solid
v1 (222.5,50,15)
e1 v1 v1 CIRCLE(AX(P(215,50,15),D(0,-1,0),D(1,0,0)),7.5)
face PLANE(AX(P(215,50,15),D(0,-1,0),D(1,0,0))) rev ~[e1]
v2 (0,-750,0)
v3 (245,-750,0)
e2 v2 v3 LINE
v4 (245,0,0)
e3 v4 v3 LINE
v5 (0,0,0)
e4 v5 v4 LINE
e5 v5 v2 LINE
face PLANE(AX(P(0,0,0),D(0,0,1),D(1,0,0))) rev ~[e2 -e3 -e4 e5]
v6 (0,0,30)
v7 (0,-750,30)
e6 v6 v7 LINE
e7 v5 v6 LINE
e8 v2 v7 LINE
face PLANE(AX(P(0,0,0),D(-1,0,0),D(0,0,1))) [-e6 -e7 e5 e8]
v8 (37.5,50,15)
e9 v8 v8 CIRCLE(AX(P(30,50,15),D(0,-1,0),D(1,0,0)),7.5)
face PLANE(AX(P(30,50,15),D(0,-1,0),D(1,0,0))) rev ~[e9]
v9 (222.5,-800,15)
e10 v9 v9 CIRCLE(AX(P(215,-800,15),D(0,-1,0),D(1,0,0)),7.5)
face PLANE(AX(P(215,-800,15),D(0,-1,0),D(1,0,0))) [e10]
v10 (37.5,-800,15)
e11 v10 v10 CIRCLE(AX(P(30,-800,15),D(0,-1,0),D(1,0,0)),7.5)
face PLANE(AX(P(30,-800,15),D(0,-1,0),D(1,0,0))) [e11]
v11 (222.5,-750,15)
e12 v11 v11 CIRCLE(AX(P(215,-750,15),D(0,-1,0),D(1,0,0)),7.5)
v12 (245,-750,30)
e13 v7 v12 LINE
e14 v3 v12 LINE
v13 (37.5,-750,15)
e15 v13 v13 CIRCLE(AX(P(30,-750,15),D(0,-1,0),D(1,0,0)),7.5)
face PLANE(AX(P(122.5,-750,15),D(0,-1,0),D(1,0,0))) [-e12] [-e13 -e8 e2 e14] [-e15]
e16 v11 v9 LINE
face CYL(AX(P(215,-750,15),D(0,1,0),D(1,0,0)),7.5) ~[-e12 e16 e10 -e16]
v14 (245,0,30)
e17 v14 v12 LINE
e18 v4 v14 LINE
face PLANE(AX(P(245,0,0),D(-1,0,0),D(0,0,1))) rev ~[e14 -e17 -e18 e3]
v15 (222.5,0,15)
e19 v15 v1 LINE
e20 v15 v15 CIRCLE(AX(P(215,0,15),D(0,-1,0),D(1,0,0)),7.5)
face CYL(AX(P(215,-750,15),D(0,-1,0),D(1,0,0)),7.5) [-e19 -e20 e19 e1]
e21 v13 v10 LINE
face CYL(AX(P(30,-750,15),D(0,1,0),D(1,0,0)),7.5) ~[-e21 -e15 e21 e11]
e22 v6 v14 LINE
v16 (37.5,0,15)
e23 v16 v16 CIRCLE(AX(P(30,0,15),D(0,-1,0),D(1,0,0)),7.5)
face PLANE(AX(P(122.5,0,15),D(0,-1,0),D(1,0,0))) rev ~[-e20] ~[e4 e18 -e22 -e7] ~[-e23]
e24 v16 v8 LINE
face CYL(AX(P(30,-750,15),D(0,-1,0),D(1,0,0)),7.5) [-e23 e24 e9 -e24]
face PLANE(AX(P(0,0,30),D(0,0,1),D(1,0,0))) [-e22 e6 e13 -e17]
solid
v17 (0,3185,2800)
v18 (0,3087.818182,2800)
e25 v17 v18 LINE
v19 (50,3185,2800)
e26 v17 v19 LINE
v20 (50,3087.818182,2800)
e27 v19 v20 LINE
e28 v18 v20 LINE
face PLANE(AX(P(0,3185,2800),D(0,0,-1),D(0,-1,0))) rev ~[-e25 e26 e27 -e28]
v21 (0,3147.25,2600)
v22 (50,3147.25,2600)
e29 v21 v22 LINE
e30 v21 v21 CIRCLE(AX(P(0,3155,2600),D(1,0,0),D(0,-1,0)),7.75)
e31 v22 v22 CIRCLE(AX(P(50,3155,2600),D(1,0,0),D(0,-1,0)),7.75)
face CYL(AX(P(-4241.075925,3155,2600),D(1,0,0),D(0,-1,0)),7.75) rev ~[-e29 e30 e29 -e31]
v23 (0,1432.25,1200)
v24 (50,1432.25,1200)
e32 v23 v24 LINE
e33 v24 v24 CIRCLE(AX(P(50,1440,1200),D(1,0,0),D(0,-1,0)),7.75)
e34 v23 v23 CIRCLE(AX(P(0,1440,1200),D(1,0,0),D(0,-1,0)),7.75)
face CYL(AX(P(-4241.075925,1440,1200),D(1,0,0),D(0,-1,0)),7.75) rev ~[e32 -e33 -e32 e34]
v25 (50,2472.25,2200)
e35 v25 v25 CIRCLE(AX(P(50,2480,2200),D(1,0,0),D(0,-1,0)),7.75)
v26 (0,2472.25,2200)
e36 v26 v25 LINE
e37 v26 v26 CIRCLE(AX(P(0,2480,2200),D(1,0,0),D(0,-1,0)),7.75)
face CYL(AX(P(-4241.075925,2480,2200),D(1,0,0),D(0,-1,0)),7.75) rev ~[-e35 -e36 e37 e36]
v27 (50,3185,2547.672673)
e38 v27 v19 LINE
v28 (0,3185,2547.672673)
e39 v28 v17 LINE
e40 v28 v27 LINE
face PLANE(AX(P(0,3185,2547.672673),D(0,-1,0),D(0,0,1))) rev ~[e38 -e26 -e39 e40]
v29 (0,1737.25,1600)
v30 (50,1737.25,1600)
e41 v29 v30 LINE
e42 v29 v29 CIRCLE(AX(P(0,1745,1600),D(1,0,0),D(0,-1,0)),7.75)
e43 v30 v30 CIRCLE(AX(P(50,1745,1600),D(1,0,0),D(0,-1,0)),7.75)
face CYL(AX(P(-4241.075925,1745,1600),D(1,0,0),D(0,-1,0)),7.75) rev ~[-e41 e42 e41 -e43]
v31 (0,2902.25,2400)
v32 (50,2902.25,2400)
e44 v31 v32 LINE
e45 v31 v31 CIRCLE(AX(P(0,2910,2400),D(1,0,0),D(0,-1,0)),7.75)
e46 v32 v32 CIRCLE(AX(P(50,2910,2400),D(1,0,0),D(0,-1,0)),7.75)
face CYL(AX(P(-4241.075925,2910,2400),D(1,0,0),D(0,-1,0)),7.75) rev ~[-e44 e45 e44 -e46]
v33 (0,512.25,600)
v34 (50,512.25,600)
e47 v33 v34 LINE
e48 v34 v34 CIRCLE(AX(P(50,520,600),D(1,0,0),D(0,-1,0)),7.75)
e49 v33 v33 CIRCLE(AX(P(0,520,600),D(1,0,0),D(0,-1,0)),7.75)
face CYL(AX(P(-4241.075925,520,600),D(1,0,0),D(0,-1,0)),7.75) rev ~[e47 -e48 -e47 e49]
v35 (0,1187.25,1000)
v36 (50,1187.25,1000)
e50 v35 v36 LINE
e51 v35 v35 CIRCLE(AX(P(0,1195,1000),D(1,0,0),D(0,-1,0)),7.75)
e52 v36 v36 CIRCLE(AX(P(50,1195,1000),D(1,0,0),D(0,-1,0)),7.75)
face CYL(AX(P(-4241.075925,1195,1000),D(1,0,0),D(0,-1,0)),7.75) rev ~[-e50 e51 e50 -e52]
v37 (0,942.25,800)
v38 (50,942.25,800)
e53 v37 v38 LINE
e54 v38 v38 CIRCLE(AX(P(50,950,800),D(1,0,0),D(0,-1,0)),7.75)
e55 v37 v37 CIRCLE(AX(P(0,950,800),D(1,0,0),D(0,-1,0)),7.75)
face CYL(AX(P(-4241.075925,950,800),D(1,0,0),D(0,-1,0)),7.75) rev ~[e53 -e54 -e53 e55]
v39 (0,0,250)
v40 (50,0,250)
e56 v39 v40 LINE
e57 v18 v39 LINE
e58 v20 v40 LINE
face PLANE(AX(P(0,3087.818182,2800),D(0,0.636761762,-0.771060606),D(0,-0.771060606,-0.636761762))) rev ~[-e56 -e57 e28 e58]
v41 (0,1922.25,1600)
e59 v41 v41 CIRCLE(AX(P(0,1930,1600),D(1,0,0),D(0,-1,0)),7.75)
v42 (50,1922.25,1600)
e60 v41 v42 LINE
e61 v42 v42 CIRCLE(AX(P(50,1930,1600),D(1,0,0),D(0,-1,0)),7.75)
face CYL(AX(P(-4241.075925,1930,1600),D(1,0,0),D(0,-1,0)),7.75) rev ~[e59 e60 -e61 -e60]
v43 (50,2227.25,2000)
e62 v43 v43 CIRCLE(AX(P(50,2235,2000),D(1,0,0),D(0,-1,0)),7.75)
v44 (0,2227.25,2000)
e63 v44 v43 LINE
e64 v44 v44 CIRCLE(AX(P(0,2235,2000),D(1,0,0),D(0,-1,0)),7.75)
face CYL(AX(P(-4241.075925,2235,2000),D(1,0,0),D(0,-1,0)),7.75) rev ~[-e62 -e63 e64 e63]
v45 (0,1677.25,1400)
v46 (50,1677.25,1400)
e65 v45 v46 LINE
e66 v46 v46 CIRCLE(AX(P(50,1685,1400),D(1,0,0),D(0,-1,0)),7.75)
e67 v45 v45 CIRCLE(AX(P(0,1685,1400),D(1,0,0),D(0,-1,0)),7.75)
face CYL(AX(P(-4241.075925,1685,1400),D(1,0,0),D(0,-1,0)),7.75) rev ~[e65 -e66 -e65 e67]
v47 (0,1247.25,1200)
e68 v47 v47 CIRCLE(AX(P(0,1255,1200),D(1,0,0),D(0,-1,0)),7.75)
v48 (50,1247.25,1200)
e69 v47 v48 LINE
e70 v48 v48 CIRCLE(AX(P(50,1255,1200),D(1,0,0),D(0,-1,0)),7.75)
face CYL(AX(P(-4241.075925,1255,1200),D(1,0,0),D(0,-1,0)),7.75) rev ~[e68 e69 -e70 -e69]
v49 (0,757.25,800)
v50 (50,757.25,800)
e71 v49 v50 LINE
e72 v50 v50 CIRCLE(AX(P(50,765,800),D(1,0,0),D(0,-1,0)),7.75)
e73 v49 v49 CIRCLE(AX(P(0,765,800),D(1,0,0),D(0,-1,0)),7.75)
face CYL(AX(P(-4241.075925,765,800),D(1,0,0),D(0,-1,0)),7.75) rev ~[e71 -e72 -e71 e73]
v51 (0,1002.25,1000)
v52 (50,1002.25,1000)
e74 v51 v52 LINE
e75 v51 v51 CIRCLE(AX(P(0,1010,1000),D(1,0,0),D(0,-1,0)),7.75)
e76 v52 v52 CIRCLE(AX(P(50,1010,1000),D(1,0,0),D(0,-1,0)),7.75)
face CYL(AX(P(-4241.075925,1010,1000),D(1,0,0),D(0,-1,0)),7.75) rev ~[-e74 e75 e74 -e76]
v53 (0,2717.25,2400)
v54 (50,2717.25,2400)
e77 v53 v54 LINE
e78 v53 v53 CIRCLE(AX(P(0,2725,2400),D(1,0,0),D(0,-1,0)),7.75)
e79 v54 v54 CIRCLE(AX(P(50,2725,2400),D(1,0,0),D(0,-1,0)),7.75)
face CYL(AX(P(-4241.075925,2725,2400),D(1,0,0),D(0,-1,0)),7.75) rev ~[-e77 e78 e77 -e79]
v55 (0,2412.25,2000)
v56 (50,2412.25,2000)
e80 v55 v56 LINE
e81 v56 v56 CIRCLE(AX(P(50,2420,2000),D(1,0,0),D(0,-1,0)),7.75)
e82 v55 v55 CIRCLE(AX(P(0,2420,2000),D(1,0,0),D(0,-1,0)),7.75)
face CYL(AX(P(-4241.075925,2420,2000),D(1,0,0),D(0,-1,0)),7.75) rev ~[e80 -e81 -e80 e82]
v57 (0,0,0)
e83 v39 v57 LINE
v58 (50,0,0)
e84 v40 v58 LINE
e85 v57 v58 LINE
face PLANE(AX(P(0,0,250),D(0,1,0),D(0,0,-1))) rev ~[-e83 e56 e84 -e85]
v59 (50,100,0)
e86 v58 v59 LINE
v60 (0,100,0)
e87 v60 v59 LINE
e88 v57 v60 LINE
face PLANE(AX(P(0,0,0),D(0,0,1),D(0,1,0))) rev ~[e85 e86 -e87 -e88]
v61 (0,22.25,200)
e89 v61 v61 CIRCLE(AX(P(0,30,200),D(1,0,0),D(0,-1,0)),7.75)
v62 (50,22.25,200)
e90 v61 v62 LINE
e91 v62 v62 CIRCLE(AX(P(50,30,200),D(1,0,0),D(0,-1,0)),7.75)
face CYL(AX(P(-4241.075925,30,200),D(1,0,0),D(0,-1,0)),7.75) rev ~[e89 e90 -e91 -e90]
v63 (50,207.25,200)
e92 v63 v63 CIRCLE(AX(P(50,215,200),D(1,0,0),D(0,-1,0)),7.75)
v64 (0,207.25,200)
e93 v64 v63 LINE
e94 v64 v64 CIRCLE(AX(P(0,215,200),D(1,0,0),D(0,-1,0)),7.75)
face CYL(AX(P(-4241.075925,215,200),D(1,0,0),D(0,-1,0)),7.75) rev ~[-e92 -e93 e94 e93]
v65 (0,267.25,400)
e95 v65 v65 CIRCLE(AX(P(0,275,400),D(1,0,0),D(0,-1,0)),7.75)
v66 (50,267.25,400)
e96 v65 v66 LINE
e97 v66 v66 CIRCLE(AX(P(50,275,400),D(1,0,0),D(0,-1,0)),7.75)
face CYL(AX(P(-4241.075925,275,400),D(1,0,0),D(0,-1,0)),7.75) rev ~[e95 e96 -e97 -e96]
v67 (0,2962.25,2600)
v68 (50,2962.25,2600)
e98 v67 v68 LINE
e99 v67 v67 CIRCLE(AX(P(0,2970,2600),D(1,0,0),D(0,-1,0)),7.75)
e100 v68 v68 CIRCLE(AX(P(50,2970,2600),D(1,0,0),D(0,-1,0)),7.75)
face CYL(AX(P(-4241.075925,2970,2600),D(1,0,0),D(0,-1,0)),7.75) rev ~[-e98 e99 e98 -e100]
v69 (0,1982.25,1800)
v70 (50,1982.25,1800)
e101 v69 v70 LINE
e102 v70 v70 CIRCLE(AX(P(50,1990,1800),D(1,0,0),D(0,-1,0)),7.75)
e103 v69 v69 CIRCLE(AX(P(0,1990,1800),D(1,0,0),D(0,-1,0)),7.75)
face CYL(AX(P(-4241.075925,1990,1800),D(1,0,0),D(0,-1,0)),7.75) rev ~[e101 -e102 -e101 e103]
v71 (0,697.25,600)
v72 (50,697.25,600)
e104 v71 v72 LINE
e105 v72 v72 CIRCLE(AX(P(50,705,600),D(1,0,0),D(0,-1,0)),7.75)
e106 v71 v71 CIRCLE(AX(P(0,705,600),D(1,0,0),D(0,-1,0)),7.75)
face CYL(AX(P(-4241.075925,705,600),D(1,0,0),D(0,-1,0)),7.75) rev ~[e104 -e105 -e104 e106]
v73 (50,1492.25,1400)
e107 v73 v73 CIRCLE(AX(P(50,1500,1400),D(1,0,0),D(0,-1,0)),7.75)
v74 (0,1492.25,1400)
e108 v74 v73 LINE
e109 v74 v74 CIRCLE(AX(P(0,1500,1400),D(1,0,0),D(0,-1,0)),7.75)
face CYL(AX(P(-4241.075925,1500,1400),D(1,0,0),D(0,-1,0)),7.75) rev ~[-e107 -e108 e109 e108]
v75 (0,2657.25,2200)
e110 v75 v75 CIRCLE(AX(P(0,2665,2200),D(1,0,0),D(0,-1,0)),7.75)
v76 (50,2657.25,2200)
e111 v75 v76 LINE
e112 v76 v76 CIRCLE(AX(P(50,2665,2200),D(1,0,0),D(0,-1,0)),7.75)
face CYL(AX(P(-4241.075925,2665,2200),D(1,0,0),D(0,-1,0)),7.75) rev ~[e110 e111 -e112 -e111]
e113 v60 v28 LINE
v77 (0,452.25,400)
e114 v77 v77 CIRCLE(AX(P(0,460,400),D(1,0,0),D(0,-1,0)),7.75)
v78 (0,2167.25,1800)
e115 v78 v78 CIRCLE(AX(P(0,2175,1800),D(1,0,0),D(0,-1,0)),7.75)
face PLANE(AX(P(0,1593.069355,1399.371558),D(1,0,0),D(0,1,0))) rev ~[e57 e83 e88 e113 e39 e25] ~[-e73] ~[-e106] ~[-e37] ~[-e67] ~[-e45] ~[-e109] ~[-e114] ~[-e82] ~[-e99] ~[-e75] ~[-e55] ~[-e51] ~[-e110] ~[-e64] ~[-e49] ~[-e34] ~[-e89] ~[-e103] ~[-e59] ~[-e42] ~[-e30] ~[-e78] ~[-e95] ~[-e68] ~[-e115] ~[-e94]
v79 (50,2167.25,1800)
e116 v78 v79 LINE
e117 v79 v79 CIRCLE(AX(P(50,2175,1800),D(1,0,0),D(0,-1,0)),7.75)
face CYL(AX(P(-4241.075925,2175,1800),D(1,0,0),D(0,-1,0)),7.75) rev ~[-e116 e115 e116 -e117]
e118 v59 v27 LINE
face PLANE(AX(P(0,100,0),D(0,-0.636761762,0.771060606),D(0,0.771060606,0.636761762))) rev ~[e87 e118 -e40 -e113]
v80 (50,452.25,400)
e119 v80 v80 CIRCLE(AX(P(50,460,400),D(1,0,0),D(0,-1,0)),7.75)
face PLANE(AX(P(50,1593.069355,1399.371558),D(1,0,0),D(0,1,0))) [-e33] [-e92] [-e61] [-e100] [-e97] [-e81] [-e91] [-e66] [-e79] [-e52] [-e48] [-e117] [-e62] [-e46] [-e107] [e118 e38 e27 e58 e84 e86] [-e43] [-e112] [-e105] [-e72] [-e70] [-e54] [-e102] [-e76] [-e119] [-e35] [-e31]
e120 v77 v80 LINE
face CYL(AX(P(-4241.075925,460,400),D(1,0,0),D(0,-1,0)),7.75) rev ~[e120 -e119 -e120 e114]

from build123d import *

# Parameters (mm, degrees)
F1_DEPTH      = 50
F2_D          = 15.5
F3_W          = 245
F3_H          = 30
F4_DEPTH      = 750
F5_R          = 7.5
F6_DEPTH      = 50
F6_DEPTH_BACK = 800


with BuildPart() as f1:
    # F0 (on Right) → F1 (new body)
    with BuildSketch(Plane.YZ):
        Polygon((0, 0), (100, 0), (3185, 2547.6726726727), (3185, 2800), (3087.8181818182, 2800), (0, 250), align=None)
    extrude(amount=F1_DEPTH)

    # F2 (through all)
    with Locations(Plane(origin=(0, 0, 0), x_dir=(0, 1, 0), z_dir=(-1, 0, 0))):
        with Locations((3400, -2800), (30, -200), (215, -200), (275, -400), (460, -400), (520, -600), (705, -600), (765, -800), (950, -800), (1010, -1000), (1195, -1000), (1255, -1200), (1440, -1200), (1500, -1400), (1685, -1400), (1745, -1600), (1930, -1600), (1990, -1800), (2175, -1800), (2235, -2000), (2420, -2000), (2480, -2200), (2665, -2200), (2725, -2400), (2910, -2400), (2970, -2600), (3155, -2600), (3215, -2800)):
            Hole(F2_D / 2)


with BuildPart() as f4:
    # F3 (on Front) → F4 (new body)
    with BuildSketch(Plane.XZ):
        with Locations((122.5, 15)):
            Rectangle(F3_W, F3_H)
    extrude(amount=F4_DEPTH)

    # F5 (on face) → F6 (join, two sides)
    with BuildSketch(Plane.XZ.offset(750)) as f6_sk:
        with Locations((30, 15)):
            Circle(F5_R)
        with Locations((215, 15)):
            Circle(F5_R)
    extrude(amount=F6_DEPTH)
    extrude(f6_sk.sketch, amount=-F6_DEPTH_BACK)


solid = Compound([f1.part, f4.part])
